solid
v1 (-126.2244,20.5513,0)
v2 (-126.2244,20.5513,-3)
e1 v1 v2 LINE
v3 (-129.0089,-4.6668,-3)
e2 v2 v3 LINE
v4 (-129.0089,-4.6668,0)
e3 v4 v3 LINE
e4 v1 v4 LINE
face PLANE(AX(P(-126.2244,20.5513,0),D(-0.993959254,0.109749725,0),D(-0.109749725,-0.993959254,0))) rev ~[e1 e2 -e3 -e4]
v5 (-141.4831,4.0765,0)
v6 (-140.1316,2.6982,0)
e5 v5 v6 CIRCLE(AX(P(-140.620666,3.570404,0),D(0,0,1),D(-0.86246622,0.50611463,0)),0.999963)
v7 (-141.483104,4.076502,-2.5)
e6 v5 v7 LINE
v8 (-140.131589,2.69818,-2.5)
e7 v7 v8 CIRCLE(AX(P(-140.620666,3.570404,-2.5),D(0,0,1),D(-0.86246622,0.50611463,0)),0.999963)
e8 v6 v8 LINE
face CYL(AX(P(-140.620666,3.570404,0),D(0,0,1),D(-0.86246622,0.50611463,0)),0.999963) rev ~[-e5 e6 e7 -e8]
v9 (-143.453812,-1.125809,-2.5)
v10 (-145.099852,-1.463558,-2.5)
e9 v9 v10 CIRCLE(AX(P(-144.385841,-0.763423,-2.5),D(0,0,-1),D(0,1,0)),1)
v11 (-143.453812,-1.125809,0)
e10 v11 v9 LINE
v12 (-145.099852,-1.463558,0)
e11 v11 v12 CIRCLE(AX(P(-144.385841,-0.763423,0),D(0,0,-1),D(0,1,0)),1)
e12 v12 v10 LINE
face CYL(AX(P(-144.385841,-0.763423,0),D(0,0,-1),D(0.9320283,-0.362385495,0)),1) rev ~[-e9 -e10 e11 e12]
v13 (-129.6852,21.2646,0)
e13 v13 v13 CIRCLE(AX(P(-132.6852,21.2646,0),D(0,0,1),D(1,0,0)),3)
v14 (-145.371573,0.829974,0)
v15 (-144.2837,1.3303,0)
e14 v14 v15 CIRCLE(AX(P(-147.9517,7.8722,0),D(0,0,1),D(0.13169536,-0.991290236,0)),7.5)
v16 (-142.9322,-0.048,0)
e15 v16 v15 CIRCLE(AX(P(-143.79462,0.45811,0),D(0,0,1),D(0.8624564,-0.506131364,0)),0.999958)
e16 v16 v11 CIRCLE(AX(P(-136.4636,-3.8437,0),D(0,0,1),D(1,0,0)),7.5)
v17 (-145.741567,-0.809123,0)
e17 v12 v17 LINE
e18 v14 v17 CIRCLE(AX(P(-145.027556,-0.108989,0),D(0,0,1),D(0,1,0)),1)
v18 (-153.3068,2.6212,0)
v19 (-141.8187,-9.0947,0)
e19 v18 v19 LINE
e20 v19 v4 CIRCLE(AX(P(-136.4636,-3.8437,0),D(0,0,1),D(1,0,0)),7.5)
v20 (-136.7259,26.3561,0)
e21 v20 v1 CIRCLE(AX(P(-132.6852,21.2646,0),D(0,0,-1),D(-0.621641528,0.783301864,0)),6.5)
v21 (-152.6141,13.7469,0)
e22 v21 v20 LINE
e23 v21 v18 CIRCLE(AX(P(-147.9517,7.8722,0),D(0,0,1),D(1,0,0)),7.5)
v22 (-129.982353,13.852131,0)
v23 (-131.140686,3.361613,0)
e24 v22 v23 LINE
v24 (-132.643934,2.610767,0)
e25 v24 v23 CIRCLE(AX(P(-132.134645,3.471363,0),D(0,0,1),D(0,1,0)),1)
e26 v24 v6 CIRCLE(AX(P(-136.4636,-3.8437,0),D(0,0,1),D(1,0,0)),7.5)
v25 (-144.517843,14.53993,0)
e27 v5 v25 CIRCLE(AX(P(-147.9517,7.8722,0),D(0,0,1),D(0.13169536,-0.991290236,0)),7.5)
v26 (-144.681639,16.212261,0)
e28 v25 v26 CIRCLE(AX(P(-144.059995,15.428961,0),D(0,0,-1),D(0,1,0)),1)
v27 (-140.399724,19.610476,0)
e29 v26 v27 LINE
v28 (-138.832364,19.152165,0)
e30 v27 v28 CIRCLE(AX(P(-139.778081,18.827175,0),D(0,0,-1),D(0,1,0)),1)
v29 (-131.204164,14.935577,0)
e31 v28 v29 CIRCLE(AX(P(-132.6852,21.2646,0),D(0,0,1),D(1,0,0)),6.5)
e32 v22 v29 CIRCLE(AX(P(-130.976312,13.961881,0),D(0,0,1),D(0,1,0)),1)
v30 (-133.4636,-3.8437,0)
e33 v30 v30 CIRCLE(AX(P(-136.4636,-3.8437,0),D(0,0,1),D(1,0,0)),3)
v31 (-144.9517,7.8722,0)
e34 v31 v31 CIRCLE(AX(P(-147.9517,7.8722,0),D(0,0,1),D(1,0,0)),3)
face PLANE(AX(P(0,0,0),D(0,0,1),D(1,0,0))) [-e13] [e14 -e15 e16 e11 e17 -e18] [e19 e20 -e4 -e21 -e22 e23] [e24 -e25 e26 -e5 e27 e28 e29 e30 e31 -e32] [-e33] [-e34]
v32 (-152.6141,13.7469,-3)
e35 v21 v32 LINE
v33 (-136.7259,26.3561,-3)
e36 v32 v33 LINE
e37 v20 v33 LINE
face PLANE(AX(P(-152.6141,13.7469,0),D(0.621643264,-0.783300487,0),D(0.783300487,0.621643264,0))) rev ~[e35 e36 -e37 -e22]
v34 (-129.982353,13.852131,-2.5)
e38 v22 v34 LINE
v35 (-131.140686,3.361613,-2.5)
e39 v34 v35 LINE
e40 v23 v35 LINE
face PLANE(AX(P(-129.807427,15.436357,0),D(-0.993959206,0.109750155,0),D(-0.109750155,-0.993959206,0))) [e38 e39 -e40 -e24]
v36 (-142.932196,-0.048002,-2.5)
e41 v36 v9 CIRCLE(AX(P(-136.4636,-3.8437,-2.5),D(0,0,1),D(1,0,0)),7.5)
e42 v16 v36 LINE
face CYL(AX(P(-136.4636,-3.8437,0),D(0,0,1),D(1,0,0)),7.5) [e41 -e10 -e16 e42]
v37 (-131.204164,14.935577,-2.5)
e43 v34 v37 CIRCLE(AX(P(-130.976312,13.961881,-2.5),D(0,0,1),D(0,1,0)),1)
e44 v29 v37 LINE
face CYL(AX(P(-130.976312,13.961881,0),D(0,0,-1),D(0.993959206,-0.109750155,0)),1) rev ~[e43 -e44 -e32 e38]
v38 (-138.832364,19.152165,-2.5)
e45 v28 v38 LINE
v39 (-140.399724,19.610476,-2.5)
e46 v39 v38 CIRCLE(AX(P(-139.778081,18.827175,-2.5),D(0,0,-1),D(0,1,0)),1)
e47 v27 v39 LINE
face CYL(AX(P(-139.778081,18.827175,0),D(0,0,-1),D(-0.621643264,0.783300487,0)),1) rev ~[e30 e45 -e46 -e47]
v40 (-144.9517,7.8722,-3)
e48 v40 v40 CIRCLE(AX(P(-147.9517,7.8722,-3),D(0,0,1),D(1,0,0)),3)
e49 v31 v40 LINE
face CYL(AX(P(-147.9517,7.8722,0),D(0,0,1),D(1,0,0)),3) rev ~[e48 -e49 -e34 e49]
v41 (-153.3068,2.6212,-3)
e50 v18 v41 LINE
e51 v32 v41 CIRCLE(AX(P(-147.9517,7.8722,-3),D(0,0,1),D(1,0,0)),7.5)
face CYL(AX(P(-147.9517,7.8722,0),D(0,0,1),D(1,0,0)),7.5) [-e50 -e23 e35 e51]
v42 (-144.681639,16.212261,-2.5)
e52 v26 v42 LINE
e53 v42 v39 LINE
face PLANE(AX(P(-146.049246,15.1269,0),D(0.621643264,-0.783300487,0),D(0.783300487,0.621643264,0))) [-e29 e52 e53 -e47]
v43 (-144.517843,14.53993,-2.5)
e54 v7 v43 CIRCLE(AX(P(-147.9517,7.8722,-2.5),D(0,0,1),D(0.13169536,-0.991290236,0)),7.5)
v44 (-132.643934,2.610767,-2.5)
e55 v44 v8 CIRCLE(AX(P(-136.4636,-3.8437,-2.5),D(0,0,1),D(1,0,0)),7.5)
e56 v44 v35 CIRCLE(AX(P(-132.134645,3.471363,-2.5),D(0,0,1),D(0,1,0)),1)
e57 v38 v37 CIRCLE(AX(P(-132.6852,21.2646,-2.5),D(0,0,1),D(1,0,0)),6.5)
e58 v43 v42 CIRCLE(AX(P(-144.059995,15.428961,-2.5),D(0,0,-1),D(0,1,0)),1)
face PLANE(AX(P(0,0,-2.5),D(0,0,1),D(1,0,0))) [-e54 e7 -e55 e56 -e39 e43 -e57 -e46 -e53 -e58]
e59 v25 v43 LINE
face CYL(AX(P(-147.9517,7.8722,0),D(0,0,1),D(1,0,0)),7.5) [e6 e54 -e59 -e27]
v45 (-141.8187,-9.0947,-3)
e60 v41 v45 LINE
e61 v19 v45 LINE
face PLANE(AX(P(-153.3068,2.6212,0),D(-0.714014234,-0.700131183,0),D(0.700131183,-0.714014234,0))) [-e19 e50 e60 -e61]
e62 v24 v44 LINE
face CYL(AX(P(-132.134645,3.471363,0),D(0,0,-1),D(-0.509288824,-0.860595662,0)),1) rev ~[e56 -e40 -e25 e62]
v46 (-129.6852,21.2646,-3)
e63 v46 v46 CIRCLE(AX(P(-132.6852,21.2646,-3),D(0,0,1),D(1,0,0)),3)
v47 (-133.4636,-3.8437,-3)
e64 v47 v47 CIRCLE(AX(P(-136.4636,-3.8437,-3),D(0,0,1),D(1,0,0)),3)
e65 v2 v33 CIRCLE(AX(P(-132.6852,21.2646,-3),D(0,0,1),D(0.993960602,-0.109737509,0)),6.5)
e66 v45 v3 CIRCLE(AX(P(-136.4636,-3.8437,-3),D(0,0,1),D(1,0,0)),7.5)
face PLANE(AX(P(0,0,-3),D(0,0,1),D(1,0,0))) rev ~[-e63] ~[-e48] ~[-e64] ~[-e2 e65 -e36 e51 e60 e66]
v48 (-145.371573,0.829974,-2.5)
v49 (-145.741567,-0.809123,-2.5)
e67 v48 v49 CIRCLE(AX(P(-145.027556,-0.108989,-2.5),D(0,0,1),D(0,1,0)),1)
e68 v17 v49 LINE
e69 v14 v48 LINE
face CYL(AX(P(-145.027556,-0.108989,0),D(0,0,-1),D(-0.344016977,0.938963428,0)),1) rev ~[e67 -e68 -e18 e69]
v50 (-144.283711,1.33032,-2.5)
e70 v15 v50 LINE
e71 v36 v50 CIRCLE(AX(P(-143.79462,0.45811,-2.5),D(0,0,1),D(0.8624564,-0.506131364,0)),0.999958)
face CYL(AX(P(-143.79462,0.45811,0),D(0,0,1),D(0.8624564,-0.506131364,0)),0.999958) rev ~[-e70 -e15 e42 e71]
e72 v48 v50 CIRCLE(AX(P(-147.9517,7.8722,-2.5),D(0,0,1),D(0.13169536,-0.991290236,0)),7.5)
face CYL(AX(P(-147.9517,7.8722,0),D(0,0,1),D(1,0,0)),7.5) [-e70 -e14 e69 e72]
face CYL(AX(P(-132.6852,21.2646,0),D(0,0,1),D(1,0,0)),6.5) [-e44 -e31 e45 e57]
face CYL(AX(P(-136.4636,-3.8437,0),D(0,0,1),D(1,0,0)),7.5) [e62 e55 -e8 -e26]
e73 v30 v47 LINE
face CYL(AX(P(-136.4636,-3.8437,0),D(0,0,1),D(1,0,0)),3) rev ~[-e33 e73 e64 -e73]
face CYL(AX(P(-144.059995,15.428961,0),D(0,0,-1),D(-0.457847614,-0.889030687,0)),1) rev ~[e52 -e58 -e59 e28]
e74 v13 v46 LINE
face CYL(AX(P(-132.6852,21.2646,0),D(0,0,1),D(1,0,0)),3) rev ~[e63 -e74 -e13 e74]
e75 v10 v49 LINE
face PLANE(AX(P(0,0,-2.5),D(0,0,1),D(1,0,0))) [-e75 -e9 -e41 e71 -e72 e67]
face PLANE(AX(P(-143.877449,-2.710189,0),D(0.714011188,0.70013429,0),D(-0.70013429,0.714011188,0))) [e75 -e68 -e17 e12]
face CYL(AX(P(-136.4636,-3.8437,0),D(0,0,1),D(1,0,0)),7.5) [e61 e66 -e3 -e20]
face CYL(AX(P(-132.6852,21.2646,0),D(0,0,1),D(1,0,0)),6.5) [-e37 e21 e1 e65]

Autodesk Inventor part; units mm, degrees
ref_plane "YZ Plane" through (0, 0, 0) normal (1, 0, 0) x (0, 1, 0)
ref_plane "XZ Plane" through (0, 0, 0) normal (0, 1, 0) x (-1, 0, 0)
ref_plane "XY Plane" through (0, 0, 0) normal (0, 0, 1) x (1, 0, 0)
sketch "スケッチ1" plane through (0, 0, 0) normal (0, 0, 1) x (1, 0, 0)
  circle A0 centre (-132.6852, 21.2646) radius 3
  circle A1 centre (-105.2485, 37.922) radius 3
  circle A2 centre (-84.1159, 33.5789) radius 3
  circle A3 centre (-77.8119, 54.5794) radius 3
  circle A4 centre (-112.1063, 12.5661) radius 3
  circle A5 centre (-136.4636, -3.8437) radius 3
  circle A6 centre (-147.9517, 7.8722) radius 3
  line L0 (-62.3105, 66.9855) -> (-56.4162, 71.4105)
  line L1 (-56.4162, 71.4105) -> (-60.2332, 71.5281)
  arc A7 (-60.2332, 71.5281) -> (-64.0951, 70.5113) centre (-60.4494, 64.5064) ccw
  line L2 (-64.0951, 70.5113) -> (-153.1544, 16.4415)
  arc A8 (-153.1544, 16.4415) -> (-154.1888, 0.0236) centre (-147.9517, 7.8722) ccw
  line L3 (-154.1888, 0.0236) -> (-141.4408, -10.1069)
  arc A9 (-141.4408, -10.1069) -> (-131.6607, -10.2415) centre (-136.4636, -3.8437) ccw
  line L4 (-131.6607, -10.2415) -> (-40.2316, 58.3956)
  arc A10 (-40.2316, 58.3956) -> (-37.5466, 65.3193) centre (-44.4492, 64.0137) ccw
  line L5 (-37.5466, 65.3193) -> (-62.5812, 46.5254)
  arc A11 (-66.3034, 51.4837) -> (-62.5812, 46.5254) centre (-64.4423, 49.0046) ccw
  line L6 (-66.3034, 51.4837) -> (-41.2688, 70.2776)
  arc A12 (-41.2688, 70.2776) -> (-44.233, 71.0354) centre (-44.4492, 64.0137) ccw
  line L7 (-44.233, 71.0354) -> (-46.496, 71.105)
  line L8 (-46.496, 71.105) -> (-58.5883, 62.0272)
  arc A13 (-62.3105, 66.9855) -> (-58.5883, 62.0272) centre (-60.4494, 64.5064) ccw
  circle A14 centre (-147.9517, 7.8722) radius 1.5
  circle A15 centre (-147.9517, 7.8722) radius 7.5
  circle A16 centre (-136.4636, -3.8437) radius 1.5
  circle A17 centre (-136.4636, -3.8437) radius 7.5
  circle A18 centre (-132.6852, 21.2646) radius 1.5
  circle A19 centre (-132.6852, 21.2646) radius 6.5
  line L9 (-152.6141, 13.7469) -> (-136.7259, 26.3561)
  line L10 (-126.2244, 20.5513) -> (-129.0089, -4.6668)
  line L11 (-153.3068, 2.6212) -> (-141.8187, -9.0947)
  point P0 (0, 0)
  point P1 (0, 0)
  dimension "d0" = 15
  dimension "d1" = 15
extrude "押し出し1" add sketch "スケッチ1" against normal blind 3 contours A19 | A19 L10 A17 L11 A15 L9 | A15 | A17
sketch "スケッチ2" plane through (0, 0, 0) normal (0, 0, 1) x (1, 0, 0)
  arc A0 (-152.6141, 13.7469) -> (-153.3068, 2.6212) centre (-147.9517, 7.8722) ccw projected
  line L0 (-153.3068, 2.6212) -> (-141.8187, -9.0947) projected
  arc A1 (-141.8187, -9.0947) -> (-129.0089, -4.6668) centre (-136.4636, -3.8437) ccw projected
  line L1 (-129.0089, -4.6668) -> (-126.2244, 20.5513) projected
  arc A2 (-126.2244, 20.5513) -> (-136.7259, 26.3561) centre (-132.6852, 21.2646) ccw projected
  line L2 (-136.7259, 26.3561) -> (-152.6141, 13.7469) projected
  circle A3 centre (-136.4636, -3.8437) radius 3 projected
  circle A4 centre (-132.6852, 21.2646) radius 3 projected
  circle A5 centre (-147.9517, 7.8722) radius 3 projected
  line L3 (-129.2063, 20.8805) -> (-131.9908, -4.3375)
  arc A6 (-139.6766, -6.9943) -> (-131.9908, -4.3375) centre (-136.4636, -3.8437) ccw
  line L4 (-139.6766, -6.9943) -> (-151.1648, 4.7216)
  arc A7 (-150.7491, 11.397) -> (-151.1648, 4.7216) centre (-147.9517, 7.8722) ccw
  line L5 (-150.7491, 11.397) -> (-134.8609, 24.0062)
  arc A8 (-129.2063, 20.8805) -> (-134.8609, 24.0062) centre (-132.6852, 21.2646) ccw
  arc A9 (-152.6141, 13.7469) -> (-153.3068, 2.6212) centre (-147.9517, 7.8722) ccw projected
  circle A10 centre (-147.9517, 7.8722) radius 7.5
  circle A11 centre (-132.6852, 21.2646) radius 6.5
  circle A12 centre (-136.4636, -3.8437) radius 7.5
  point P0 (0, 0)
  point P1 (-143.8774, -2.7102)
  point P2 (-131.3323, 1.6262)
  point P3 (-129.8074, 15.4364)
  point P4 (-139.1512, 20.6013)
  point P5 (-146.0493, 15.1269)
  point P6 (-146.964, 0.4375)
  dimension "d4" = 3
extrude "押し出し2" cut sketch "スケッチ2" against normal blind 2.5 contours L5 A11 L3 A12 L4 A10
sketch "スケッチ3" plane through (0, 0, 0) normal (0, 0, 1) x (1, 0, 0)
  arc A0 (-146.964, 0.4375) -> (-146.0493, 15.1269) centre (-147.9517, 7.8722) ccw projected
  line L0 (-146.0493, 15.1269) -> (-139.1512, 20.6013) projected
  arc A1 (-139.1512, 20.6013) -> (-129.8074, 15.4364) centre (-132.6852, 21.2646) ccw projected
  line L1 (-129.8074, 15.4364) -> (-131.3323, 1.6262) projected
  arc A2 (-131.3323, 1.6262) -> (-143.8774, -2.7102) centre (-136.4636, -3.8437) ccw projected
  line L2 (-143.8774, -2.7102) -> (-146.964, 0.4375) projected
  arc A3 (-152.6141, 13.7469) -> (-153.3068, 2.6212) centre (-147.9517, 7.8722) ccw projected
  line L3 (-153.3068, 2.6212) -> (-141.8187, -9.0947) projected
  arc A4 (-141.8187, -9.0947) -> (-129.0089, -4.6668) centre (-136.4636, -3.8437) ccw projected
  line L4 (-129.0089, -4.6668) -> (-126.2244, 20.5513) projected
  arc A5 (-126.2244, 20.5513) -> (-136.7259, 26.3561) centre (-132.6852, 21.2646) ccw projected
  line L5 (-136.7259, 26.3561) -> (-152.6141, 13.7469) projected
  circle A6 centre (-136.4636, -3.8437) radius 3 projected
  circle A7 centre (-132.6852, 21.2646) radius 3 projected
  circle A8 centre (-147.9517, 7.8722) radius 3 projected
  arc A9 (-142.9322, -0.048) -> (-144.2837, 1.3303) centre (-143.7947, 0.4581) ccw
  arc A10 (-141.4831, 4.0765) -> (-140.1316, 2.6982) centre (-140.6207, 3.5704) ccw
  point P0 (0, 0)
  dimension "d7" = 2
  dimension "d8" = 2
extrude "押し出し3" add sketch "スケッチ3" against normal blind 3 contours A0 A10 A2 A9
fillet "フィレット1" radius 1 6 edges at (-146.964, 0.4375, -1.25) (-143.8774, -2.7102, -1.25) (-146.0493, 15.1269, -1.25) (-139.1512, 20.6013, -1.25) (-129.8074, 15.4364, -1.25) (-131.3323, 1.6262, -1.25)
properties part number "アーム 中間節 先端中詰め" material "ポリカーボネート、クリア"
